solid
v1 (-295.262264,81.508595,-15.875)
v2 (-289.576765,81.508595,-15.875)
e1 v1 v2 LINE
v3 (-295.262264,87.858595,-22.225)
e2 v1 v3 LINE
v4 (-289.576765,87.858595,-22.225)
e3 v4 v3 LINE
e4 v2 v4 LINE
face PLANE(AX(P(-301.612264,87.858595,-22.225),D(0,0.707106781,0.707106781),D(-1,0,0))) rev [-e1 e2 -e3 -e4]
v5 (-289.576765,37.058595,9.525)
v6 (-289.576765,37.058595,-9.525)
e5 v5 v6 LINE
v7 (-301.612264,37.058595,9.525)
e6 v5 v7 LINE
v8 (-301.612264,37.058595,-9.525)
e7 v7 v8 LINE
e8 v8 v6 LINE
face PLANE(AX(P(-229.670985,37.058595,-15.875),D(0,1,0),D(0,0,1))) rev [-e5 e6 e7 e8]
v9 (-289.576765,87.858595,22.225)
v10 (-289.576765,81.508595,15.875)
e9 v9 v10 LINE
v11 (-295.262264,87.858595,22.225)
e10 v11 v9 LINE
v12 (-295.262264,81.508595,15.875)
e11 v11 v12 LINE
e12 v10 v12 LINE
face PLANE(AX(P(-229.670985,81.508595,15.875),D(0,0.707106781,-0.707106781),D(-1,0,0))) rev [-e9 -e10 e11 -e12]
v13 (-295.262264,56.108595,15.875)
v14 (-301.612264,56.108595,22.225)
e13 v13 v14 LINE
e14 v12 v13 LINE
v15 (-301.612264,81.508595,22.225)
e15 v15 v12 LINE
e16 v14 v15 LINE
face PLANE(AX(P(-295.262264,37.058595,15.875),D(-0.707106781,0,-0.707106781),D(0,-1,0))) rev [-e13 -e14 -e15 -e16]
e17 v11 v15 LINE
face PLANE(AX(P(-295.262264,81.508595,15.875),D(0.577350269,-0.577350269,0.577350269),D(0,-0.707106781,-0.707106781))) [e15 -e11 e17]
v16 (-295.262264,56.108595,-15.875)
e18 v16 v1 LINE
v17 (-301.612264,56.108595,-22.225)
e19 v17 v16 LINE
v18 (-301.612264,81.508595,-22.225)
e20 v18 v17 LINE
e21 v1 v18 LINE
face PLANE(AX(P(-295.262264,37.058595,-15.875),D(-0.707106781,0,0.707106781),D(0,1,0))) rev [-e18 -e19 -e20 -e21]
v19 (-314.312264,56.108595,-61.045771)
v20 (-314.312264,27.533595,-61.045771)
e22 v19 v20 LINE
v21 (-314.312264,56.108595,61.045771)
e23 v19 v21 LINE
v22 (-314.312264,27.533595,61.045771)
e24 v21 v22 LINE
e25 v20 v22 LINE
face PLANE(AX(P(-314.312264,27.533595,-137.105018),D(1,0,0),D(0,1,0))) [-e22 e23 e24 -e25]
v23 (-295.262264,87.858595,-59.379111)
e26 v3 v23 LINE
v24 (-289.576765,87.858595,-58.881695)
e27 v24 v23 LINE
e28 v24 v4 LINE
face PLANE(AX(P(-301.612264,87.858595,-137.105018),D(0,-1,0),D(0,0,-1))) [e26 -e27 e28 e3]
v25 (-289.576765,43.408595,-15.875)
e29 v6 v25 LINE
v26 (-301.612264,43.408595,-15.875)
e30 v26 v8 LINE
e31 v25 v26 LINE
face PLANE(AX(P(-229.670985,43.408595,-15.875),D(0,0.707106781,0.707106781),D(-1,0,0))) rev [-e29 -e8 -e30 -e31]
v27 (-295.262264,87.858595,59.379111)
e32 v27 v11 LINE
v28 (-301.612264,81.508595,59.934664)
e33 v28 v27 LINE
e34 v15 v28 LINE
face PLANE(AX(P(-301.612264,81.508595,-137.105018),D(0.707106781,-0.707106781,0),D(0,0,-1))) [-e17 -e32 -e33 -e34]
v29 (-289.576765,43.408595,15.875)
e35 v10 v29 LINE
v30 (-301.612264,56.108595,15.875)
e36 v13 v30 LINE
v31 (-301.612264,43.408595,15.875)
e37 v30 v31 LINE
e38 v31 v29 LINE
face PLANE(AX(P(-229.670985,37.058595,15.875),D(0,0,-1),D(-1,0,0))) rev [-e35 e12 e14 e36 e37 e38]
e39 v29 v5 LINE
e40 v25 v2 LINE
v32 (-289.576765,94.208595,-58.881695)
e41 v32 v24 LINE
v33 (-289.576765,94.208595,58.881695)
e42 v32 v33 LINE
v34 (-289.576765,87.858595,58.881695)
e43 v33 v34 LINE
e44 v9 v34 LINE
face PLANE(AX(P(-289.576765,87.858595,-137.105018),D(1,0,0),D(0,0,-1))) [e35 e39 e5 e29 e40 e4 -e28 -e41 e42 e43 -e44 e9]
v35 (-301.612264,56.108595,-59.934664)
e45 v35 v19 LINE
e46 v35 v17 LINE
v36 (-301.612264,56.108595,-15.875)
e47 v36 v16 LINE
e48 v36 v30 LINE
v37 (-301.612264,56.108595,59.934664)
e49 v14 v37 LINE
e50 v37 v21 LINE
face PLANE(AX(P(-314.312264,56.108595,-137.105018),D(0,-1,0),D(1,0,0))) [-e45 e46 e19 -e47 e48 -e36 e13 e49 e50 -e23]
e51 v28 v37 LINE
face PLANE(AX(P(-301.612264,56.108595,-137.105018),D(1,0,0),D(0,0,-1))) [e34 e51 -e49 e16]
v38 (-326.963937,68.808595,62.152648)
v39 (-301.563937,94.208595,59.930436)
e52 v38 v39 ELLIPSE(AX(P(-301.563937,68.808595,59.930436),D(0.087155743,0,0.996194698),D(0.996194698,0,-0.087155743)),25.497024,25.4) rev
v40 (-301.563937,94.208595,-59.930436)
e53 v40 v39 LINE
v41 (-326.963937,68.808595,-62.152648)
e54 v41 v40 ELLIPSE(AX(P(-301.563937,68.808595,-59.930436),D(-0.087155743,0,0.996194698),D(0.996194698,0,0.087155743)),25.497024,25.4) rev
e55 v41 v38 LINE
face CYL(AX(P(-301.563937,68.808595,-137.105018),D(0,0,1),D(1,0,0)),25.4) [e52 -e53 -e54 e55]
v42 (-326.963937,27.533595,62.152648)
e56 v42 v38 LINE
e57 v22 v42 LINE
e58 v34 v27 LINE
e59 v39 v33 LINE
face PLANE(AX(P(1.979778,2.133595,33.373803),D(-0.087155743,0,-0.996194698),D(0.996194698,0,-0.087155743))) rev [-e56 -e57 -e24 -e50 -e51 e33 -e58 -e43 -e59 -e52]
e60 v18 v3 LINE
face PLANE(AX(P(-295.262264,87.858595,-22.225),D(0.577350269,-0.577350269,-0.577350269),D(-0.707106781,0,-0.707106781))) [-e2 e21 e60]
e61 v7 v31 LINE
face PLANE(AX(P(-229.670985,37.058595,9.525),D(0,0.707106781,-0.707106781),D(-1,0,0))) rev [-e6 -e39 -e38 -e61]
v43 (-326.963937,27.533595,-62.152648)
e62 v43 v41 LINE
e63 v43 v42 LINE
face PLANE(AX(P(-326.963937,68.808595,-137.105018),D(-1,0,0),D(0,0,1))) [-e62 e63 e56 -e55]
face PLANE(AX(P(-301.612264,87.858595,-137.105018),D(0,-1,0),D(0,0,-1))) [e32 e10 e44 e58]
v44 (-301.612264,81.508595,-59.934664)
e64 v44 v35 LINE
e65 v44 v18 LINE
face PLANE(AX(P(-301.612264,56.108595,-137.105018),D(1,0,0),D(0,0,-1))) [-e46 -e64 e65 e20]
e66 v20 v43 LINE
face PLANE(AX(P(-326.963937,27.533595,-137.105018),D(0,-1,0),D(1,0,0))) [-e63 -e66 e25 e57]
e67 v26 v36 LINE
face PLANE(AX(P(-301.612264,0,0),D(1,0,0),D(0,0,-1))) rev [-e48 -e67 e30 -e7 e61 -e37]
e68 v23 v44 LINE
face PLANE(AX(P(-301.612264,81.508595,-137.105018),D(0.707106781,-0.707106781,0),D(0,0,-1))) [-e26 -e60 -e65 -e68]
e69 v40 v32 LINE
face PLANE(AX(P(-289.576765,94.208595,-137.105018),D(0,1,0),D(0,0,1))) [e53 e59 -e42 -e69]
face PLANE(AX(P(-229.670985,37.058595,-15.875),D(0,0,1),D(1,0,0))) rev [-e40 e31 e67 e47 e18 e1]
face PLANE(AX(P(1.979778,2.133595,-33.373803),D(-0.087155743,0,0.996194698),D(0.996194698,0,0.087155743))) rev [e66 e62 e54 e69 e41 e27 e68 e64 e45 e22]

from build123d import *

# Parameters (mm, degrees)
BOSS_EXTRUDE1_START       = -62.152648455
BOSS_EXTRUDE1_DEPTH       = 62.152648455
BOSS_EXTRUDE1_START_2     = 33.419354119
BOSS_EXTRUDE1_2_OUTLINE_W = 41
BOSS_EXTRUDE1_2_OUTLINE_H = 70
BOSS_EXTRUDE1_2_DEPTH     = 4.580645881
SKETCH2_W                 = 31.75
SKETCH2_H                 = 50.8
BOSS_EXTRUDE2_DEPTH       = 12.035499154
CHAMFER1_SIZE             = 6.35


with BuildPart() as part:
    # Boss-Extrude1: read off the stored shape, not the designer's step
    # Boss-Extrude1 outline → Boss-Extrude1 (new body)
    with BuildSketch(Plane.XY.offset(BOSS_EXTRUDE1_START)):
        with BuildLine():
            Line((-301.612263914, 87.858595148), (-289.57676476, 87.858595148))
            Line((-289.57676476, 87.858595148), (-289.57676476, 94.208595148))
            Line((-289.57676476, 94.208595148), (-301.56393658, 94.208595148))
            ThreePointArc((-301.56393658, 94.208595148), (-319.524448822, 86.76910739), (-326.96393658, 68.808595148))
            Line((-326.96393658, 68.808595148), (-326.96393658, 27.533595148))
            Line((-326.96393658, 27.533595148), (-314.312263914, 27.533595148))
            Line((-314.312263914, 27.533595148), (-314.312263914, 56.108595148))
            Line((-314.312263914, 56.108595148), (-301.612263914, 56.108595148))
            Line((-301.612263914, 56.108595148), (-301.612263914, 87.858595148))
        make_face()
    boss_extrude1 = extrude(amount=BOSS_EXTRUDE1_DEPTH)

    # Boss-Extrude1 2 outline → Boss-Extrude1 2 (cut)
    with BuildSketch(Plane(origin=(0, 0, 0), x_dir=(0.9961946980917454, 0, 0.08715574274765814), z_dir=(0.08715574274765815, 0, -0.9961946980917455)).offset(BOSS_EXTRUDE1_START_2)):
        with Locations((-312.5, -61)):
            Rectangle(BOSS_EXTRUDE1_2_OUTLINE_W, BOSS_EXTRUDE1_2_OUTLINE_H)
    boss_extrude1_2 = extrude(amount=BOSS_EXTRUDE1_2_DEPTH, mode=Mode.SUBTRACT)

    # Mirror1: Boss-Extrude1, Boss-Extrude1 2 across plane
    add(boss_extrude1.mirror(Plane.XY))
    add(boss_extrude1_2.mirror(Plane.XY), mode=Mode.SUBTRACT)

    # Sketch2 → Boss-Extrude2 (add)
    with BuildSketch(Plane(origin=(-301.612263914, 0, 0), x_dir=(0, 0, -1), z_dir=(1, 0, 0))):
        with Locations((0, 62.458595148)):
            Rectangle(SKETCH2_W, SKETCH2_H)
    extrude(amount=BOSS_EXTRUDE2_DEPTH)

    # Chamfer1
    chamfer1_edges = [part.edges().sort_by_distance(p)[0] for p in [
        (-295.594514337, 37.058595148, -15.875),
        (-295.594514337, 37.058595148, 15.875),
        (-295.594514337, 87.858595148, 15.875),
        (-301.612263914, 87.858595148, 37.904832248),
        (-301.612263914, 71.983595148, 15.875),
        (-295.594514337, 87.858595148, -15.875),
        (-301.612263914, 71.983595148, -15.875),
        (-301.612263914, 87.858595148, -37.904832248),
    ]]
    chamfer(chamfer1_edges, length=CHAMFER1_SIZE)


solid = part.part
